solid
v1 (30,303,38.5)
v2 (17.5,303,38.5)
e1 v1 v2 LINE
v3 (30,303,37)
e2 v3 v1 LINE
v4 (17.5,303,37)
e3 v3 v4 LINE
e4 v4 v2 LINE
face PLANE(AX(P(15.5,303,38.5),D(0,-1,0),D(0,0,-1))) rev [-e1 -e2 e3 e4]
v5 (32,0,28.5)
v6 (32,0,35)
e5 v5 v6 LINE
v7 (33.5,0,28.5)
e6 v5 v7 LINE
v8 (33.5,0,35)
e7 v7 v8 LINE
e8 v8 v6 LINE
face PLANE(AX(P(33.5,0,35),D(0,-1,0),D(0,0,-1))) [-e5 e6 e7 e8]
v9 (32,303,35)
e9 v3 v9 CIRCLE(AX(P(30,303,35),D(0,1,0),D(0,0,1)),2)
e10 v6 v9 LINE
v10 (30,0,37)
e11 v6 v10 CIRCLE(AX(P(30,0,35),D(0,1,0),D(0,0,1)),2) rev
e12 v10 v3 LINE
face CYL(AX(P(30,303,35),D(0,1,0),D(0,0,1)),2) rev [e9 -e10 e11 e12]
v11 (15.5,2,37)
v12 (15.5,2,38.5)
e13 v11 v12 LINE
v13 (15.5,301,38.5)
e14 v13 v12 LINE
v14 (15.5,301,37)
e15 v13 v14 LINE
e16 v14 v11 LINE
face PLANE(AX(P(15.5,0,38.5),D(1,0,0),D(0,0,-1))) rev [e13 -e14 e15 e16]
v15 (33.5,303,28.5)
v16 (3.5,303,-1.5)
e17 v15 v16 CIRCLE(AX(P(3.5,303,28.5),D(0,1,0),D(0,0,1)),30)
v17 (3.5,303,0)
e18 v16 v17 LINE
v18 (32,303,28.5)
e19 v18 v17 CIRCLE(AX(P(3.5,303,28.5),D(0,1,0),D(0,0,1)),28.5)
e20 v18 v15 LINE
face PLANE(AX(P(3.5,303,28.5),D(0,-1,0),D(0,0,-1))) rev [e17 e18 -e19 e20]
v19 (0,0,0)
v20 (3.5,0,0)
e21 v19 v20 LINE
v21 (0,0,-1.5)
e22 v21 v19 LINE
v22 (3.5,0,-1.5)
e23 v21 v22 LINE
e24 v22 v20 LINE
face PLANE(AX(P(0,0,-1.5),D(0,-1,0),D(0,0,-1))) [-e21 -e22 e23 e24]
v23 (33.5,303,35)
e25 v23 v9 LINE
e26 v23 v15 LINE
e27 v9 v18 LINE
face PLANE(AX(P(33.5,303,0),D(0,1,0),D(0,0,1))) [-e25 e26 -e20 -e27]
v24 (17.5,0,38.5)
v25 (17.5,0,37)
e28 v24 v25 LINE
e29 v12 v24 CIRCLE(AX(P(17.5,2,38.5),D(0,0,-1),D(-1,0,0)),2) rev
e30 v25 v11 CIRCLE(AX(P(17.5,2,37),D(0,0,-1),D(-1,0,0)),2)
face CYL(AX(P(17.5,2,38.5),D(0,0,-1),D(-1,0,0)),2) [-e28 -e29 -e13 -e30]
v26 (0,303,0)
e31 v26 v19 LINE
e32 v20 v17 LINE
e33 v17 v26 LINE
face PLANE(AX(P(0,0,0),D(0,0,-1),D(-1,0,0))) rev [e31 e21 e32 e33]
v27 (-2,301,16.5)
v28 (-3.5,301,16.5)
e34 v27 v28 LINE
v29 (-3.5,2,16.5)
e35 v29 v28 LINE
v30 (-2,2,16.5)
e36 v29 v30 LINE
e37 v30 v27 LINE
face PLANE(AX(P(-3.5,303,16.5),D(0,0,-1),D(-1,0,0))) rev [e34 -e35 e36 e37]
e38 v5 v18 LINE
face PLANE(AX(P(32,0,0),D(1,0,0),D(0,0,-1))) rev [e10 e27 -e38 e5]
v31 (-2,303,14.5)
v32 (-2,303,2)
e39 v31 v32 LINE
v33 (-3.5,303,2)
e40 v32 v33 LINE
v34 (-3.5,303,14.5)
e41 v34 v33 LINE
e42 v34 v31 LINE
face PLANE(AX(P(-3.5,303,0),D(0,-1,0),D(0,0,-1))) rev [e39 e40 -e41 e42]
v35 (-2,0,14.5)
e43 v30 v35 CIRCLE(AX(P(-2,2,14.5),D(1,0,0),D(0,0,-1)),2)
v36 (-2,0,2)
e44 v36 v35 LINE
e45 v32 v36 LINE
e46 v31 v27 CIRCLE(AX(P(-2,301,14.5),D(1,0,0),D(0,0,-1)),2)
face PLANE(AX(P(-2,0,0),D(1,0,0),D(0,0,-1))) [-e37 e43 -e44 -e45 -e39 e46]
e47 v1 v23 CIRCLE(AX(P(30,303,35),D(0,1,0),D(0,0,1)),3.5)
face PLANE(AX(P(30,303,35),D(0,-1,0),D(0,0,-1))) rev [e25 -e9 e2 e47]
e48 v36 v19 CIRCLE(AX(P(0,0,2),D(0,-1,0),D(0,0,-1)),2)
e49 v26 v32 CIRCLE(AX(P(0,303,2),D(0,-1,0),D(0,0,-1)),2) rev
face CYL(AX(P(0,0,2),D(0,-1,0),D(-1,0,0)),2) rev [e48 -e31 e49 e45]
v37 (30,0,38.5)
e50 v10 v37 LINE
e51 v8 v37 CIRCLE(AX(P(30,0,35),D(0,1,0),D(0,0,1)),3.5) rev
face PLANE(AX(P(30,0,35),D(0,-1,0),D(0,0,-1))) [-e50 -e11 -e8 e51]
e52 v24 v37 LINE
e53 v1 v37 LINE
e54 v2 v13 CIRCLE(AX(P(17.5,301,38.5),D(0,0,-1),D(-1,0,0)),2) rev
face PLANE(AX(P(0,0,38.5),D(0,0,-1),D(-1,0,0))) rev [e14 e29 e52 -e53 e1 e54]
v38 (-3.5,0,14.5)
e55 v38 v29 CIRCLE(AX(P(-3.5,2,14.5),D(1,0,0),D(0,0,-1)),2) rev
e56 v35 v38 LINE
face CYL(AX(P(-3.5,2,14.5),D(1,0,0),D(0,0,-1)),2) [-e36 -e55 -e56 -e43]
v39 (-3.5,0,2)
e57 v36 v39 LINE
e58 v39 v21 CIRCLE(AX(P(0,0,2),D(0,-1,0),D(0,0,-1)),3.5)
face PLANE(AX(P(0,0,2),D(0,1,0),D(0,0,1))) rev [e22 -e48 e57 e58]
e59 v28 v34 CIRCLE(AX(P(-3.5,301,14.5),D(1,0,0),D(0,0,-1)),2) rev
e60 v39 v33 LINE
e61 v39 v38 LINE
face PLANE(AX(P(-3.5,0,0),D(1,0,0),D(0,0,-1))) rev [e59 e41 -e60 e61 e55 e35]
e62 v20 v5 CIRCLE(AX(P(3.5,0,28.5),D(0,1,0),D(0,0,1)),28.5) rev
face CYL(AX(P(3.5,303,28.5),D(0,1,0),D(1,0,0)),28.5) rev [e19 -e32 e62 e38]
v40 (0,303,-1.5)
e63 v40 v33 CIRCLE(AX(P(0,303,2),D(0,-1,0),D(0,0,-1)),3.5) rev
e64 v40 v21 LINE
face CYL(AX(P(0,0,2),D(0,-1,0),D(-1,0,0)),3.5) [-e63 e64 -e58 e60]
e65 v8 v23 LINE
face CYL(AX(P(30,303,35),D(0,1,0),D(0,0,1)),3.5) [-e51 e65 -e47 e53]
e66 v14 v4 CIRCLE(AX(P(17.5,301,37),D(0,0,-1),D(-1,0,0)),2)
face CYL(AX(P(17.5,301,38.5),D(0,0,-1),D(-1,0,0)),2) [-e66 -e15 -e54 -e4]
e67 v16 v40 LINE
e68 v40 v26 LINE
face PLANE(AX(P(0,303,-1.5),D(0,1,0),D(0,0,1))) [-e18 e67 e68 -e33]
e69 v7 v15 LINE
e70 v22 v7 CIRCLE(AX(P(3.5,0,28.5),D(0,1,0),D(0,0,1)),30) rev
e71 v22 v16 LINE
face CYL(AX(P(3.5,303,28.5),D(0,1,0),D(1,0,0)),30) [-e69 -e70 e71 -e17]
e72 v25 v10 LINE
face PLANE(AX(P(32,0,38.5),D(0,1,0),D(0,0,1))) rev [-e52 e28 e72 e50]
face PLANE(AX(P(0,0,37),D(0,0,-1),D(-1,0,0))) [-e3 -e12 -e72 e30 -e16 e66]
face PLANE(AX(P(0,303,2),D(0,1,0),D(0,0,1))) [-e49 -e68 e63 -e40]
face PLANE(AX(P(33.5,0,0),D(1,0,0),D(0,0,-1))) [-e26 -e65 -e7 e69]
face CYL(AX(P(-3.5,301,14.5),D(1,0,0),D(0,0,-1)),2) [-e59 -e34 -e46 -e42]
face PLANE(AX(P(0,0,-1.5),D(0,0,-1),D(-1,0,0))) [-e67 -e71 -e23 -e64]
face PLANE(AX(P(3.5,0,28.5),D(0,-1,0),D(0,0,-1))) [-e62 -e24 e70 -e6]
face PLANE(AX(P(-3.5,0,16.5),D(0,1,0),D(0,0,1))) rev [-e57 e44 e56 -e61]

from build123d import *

# Parameters (mm, degrees)
SKETCH_8_W              = 3.5
SKETCH_8_H              = 303
SM_BASE_FLANGE_3_DEPTH  = 1.5
SM_EDGE_FLANGE_4_DEPTH  = 303
SM_EDGE_FLANGE_9_DEPTH  = 303
SM_EDGE_FLANGE_10_DEPTH = 303
FILLET_1_R              = 2


# Sheet-metal steps are written as plain solids
with BuildPart() as part:
    # Эскиз8 → Базовая кромка3 (new body)
    with BuildSketch(Plane.XY):
        with Locations((1.75, 151.5)):
            Rectangle(SKETCH_8_W, SKETCH_8_H)
    extrude(amount=-SM_BASE_FLANGE_3_DEPTH)

    # Ребро-кромка4 section (across the edge) → Ребро-кромка4 (add)
    with BuildSketch(Plane(origin=(32, 0, 0), x_dir=(-1, 0, 0), z_dir=(0, 1, 0))):
        with BuildLine():
            Line((-1.5, 28.5), (-1.5, 35))
            Line((-1.5, 35), (0, 35))
            Line((0, 35), (0, 28.5))
            ThreePointArc((0, 28.5), (8.347456736, 8.347456736), (28.5, 0))
            Line((28.5, 0), (28.5, -1.5))
            ThreePointArc((28.5, -1.5), (7.286796564, 7.286796564), (-1.5, 28.5))
        make_face()
    extrude(amount=SM_EDGE_FLANGE_4_DEPTH)

    # Ребро-кромка9 section (across the edge) → Ребро-кромка9 (add)
    with BuildSketch(Plane(origin=(-2, 303, 0), x_dir=(1, 0, 0), z_dir=(0, -1, 0))):
        with BuildLine():
            Line((-1.5, 2), (-1.5, 16.5))
            Line((-1.5, 16.5), (0, 16.5))
            Line((0, 16.5), (0, 2))
            ThreePointArc((0, 2), (0.585786438, 0.585786438), (2, 0))
            Line((2, 0), (2, -1.5))
            ThreePointArc((2, -1.5), (-0.474873734, -0.474873734), (-1.5, 2))
        make_face()
    extrude(amount=SM_EDGE_FLANGE_9_DEPTH)

    # Ребро-кромка10 section (across the edge) → Ребро-кромка10 (add)
    with BuildSketch(Plane(origin=(32, 0, 37), x_dir=(0, 0, -1), z_dir=(0, 1, 0))):
        with BuildLine():
            Line((-1.5, 2), (-1.5, 16.5))
            Line((-1.5, 16.5), (0, 16.5))
            Line((0, 16.5), (0, 2))
            ThreePointArc((0, 2), (0.585786438, 0.585786438), (2, 0))
            Line((2, 0), (2, -1.5))
            ThreePointArc((2, -1.5), (-0.474873734, -0.474873734), (-1.5, 2))
        make_face()
    extrude(amount=SM_EDGE_FLANGE_10_DEPTH)

    # Скругление1
    fillet_1_edges = [part.edges().sort_by_distance(p)[0] for p in [
        (-2.75, 303, 16.5),
        (-2.75, 0, 16.5),
        (15.5, 0, 37.75),
        (15.5, 303, 37.75),
    ]]
    fillet(fillet_1_edges, radius=FILLET_1_R)


solid = part.part
